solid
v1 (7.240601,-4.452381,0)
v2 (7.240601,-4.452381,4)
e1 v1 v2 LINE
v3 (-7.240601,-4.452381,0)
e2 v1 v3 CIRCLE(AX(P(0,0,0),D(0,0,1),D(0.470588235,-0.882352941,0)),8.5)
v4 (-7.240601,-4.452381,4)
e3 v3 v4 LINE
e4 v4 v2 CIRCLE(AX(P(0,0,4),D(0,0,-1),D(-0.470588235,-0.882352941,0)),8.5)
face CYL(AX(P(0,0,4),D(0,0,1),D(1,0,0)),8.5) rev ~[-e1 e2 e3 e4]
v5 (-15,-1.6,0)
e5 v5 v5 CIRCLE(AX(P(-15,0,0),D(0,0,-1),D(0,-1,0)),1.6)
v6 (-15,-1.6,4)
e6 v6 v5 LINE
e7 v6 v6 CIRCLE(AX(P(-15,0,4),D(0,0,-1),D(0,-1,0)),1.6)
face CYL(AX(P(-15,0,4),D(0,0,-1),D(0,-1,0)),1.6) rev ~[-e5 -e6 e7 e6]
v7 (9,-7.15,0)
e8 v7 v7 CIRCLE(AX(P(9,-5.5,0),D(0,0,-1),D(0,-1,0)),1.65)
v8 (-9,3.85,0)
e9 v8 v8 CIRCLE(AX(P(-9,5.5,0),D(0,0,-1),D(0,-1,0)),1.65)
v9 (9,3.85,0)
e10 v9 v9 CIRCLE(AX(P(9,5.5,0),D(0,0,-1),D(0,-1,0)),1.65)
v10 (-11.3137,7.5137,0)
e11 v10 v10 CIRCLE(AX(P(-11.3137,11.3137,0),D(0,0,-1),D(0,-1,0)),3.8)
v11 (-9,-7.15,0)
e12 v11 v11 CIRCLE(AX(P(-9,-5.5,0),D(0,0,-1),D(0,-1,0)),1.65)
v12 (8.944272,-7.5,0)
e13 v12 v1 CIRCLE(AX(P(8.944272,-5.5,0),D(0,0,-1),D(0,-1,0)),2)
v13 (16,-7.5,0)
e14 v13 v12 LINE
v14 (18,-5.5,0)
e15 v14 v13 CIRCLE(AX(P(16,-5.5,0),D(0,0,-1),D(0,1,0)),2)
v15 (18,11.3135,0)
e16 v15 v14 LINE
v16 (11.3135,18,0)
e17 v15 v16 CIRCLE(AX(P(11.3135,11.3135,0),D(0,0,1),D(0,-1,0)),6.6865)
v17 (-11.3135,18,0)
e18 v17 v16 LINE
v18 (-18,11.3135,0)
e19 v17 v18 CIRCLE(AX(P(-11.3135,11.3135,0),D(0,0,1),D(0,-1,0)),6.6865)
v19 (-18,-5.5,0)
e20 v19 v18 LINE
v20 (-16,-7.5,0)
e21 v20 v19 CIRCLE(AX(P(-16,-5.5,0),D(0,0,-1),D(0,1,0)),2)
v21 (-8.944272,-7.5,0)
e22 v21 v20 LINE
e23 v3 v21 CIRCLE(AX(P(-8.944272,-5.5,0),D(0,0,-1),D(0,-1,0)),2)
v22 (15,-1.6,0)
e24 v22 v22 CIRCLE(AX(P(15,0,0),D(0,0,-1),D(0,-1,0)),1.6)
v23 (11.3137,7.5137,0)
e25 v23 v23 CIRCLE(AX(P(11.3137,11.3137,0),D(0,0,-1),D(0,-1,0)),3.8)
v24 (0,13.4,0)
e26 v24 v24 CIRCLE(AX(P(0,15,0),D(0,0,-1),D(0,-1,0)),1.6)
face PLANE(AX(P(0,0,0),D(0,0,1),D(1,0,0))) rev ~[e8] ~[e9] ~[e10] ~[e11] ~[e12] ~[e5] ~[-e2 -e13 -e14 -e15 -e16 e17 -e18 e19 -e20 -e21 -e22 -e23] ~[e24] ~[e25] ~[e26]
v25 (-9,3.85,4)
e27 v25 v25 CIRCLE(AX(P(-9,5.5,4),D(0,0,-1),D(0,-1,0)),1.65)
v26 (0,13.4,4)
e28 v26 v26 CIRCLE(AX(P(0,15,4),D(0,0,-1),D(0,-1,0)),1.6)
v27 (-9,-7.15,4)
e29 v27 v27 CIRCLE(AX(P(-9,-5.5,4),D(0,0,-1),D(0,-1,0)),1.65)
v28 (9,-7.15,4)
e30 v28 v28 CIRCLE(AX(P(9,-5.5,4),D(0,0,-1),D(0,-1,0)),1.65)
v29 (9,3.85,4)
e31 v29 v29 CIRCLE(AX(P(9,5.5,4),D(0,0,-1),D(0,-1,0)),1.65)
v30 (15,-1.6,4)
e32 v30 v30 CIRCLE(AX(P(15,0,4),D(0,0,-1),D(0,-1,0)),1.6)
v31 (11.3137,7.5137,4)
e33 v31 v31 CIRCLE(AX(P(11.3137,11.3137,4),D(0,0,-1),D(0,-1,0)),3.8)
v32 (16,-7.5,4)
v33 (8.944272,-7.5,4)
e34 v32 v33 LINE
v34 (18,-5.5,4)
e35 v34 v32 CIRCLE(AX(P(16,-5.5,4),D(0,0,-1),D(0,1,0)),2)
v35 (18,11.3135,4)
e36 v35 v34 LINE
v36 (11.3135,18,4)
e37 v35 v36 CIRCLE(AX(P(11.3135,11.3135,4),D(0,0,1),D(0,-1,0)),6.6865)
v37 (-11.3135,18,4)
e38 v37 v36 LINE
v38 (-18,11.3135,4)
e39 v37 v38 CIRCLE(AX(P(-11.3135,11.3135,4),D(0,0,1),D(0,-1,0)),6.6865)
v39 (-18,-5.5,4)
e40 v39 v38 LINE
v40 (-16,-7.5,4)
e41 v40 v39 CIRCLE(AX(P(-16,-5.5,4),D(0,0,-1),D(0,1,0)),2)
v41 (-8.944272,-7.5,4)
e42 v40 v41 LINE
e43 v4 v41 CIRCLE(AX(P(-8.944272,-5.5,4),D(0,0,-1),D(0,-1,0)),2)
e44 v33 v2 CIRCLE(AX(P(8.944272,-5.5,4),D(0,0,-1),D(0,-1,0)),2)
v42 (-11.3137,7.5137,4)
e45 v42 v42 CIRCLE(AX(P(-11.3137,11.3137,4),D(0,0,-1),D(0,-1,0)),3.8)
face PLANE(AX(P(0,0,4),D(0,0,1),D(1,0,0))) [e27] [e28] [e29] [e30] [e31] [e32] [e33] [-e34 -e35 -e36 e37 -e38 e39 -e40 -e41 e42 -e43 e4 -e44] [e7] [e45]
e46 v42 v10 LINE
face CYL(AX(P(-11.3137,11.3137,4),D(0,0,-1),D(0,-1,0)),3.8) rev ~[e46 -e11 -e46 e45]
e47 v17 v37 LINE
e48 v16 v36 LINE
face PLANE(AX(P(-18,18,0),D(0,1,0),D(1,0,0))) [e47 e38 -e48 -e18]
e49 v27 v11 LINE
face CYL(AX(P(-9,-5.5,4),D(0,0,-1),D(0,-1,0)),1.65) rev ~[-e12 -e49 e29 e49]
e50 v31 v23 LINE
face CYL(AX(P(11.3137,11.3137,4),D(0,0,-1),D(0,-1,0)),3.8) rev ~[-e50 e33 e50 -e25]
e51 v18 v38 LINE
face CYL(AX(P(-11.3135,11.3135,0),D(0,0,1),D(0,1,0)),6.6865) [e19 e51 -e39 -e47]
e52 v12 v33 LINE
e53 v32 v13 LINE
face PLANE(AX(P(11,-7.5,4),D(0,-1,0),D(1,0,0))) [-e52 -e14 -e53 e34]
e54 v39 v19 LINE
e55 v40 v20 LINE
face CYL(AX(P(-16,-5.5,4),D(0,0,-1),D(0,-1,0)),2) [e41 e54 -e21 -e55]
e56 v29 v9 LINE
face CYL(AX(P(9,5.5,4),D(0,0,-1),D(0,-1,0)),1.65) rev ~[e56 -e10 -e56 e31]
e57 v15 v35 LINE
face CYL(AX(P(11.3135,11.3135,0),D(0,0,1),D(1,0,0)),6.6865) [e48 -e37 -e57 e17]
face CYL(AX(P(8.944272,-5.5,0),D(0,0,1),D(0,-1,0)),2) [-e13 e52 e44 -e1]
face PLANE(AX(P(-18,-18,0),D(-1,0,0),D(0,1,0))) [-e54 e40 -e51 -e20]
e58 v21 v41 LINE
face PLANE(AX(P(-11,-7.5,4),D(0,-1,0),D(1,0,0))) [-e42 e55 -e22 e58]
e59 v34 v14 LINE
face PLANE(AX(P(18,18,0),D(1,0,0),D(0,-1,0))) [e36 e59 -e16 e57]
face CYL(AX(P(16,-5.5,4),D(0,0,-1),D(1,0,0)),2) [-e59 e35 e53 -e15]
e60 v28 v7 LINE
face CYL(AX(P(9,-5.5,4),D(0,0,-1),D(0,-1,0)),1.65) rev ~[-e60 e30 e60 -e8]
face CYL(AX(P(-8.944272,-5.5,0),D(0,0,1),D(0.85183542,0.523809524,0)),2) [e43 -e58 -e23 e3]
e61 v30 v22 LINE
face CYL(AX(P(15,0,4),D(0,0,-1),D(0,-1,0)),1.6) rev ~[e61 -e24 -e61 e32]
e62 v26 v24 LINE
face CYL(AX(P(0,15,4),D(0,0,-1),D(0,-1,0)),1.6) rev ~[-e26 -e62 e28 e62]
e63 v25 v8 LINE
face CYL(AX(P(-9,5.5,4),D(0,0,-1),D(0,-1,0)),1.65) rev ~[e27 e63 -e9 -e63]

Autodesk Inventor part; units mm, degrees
ref_plane "YZ Plane" through (0, 0, 0) normal (1, 0, 0) x (0, 1, 0)
ref_plane "XZ Plane" through (0, 0, 0) normal (0, 1, 0) x (-1, 0, 0)
ref_plane "XY Plane" through (0, 0, 0) normal (0, 0, 1) x (1, 0, 0)
sketch "スケッチ1" plane through (0, 0, 0) normal (0, 0, 1) x (1, 0, 0)
  line L0 (18, -18) -> (-18, -18)
  line L1 (-18, -18) -> (-18, 18)
  line L2 (-18, 18) -> (18, 18)
  line L3 (18, 18) -> (18, -18)
  line L4 (18, -18) -> (-18, 18) construction
  line L5 (-18, -18) -> (18, 18) construction
  point P0 (0, 0)
  point P1 (0, 0)
  dimension "d34" = 36
  dimension "d35" = 36
extrude "押し出し1" add sketch "スケッチ1" along normal blind 4
sketch "スケッチ3" plane through (0, 0, 4) normal (0, 0, 1) x (1, 0, 0)
  line L0 (-9, -5.5) -> (9, -5.5)
  line L1 (9, -5.5) -> (9, 5.5)
  line L2 (9, 5.5) -> (-9, 5.5)
  line L3 (-9, 5.5) -> (-9, -5.5)
  line L4 (-9, -5.5) -> (9, 5.5) construction
  line L5 (9, -5.5) -> (-9, 5.5) construction
  point P0 (0, 0)
  dimension "d18" = 18
  dimension "d19" = 11
hole "穴2" at (-9, 5.5, 4) at (-9, -5.5, 4) at (9, -5.5, 4) at (9, 5.5, 4) direction (0, 0, -1) diameter 3.3 end through all
sketch "スケッチ4" plane through (0, 0, 4) normal (0, 0, 1) x (1, 0, 0)
  circle A0 centre (0, 0) radius 8.5
  dimension "d27" = 17
extrude "押し出し2" cut sketch "スケッチ4" against normal through all
sketch "スケッチ5" plane through (0, 0, 4) normal (0, 0, 1) x (1, 0, 0)
  circle A0 centre (0, 0) radius 15
  point P0 (0, 15)
  point P1 (-15, 0)
  point P2 (0, -15)
  point P3 (15, 0)
  dimension "d36" = 30
  dimension "d39" = 360
hole "穴3" at (15, 0, 4) at (-15, 0, 4) at (0, 15, 4) direction (0, 0, -1) diameter 3.2 end through all clearance for "Flat Head Machine Screw" size "M3" standard "Ansi Metric M Profile"
sketch "スケッチ6" plane through (0, 0, 4) normal (0, 0, 1) x (1, 0, 0)
  circle A0 centre (0, 0) radius 16
  point P0 (-11.3137, 11.3137)
  point P1 (-11.3137, -11.3137)
  point P2 (11.3137, -11.3137)
  point P3 (11.3137, 11.3137)
  dimension "d48" = 32
  dimension "d51" = 360
hole "穴4" at (-11.3137, 11.3137, 4) at (-11.3137, -11.3137, 4) at (11.3137, -11.3137, 4) at (11.3137, 11.3137, 4) direction (0, 0, -1) diameter 4.3 end through all counterbore diameter 7.6 counterbore depth 10 clearance for "Socket Head Cap Screw" size "M4" standard "Ansi Metric M Profile"
sketch "スケッチ9" plane through (0, 0, 4) normal (0, 0, 1) x (1, 0, 0)
  line L0 (-11, -7.5) -> (11, -7.5)
  line L1 (11, -7.5) -> (11, 7.5)
  line L2 (11, 7.5) -> (-11, 7.5)
  line L3 (-11, 7.5) -> (-11, -7.5)
  line L4 (-11, -7.5) -> (11, 7.5) construction
  line L5 (11, -7.5) -> (-11, 7.5) construction
  line L6 (-18, 18) -> (-18, -18) projected
  line L7 (-18, -7.5) -> (18, -7.5)
  line L8 (18, -7.5) -> (18, -18)
  line L9 (18, -18) -> (-18, -18)
  line L10 (-18, -18) -> (-18, -7.5)
  line L11 (18, -18) -> (18, 18) projected
  point P0 (0, 0)
  point P1 (18, -11.3137)
  point P2 (18, 11.3137)
  point P3 (-18, -11.3137)
  dimension "d71" = 22
  dimension "d72" = 15
extrude "押し出し5" cut sketch "スケッチ9" against normal through all contours L0 L7 L8 L9 L6
fillet "フィレット2" radius 2 4 edges at (4, -7.5, 2) (-4, -7.5, 2) (-18, -7.5, 2) (18, -7.5, 2)
sketch "スケッチ11" plane through (0, 0, 0) normal (0, 0, -1) x (-1, 0, 0)
  point P0 (0, 0)
fillet "フィレット4" radius 6.6865 2 edges at (-18, 18, 2) (18, 18, 2)
properties part number "unit-base5" material "ABS プラスチック"
